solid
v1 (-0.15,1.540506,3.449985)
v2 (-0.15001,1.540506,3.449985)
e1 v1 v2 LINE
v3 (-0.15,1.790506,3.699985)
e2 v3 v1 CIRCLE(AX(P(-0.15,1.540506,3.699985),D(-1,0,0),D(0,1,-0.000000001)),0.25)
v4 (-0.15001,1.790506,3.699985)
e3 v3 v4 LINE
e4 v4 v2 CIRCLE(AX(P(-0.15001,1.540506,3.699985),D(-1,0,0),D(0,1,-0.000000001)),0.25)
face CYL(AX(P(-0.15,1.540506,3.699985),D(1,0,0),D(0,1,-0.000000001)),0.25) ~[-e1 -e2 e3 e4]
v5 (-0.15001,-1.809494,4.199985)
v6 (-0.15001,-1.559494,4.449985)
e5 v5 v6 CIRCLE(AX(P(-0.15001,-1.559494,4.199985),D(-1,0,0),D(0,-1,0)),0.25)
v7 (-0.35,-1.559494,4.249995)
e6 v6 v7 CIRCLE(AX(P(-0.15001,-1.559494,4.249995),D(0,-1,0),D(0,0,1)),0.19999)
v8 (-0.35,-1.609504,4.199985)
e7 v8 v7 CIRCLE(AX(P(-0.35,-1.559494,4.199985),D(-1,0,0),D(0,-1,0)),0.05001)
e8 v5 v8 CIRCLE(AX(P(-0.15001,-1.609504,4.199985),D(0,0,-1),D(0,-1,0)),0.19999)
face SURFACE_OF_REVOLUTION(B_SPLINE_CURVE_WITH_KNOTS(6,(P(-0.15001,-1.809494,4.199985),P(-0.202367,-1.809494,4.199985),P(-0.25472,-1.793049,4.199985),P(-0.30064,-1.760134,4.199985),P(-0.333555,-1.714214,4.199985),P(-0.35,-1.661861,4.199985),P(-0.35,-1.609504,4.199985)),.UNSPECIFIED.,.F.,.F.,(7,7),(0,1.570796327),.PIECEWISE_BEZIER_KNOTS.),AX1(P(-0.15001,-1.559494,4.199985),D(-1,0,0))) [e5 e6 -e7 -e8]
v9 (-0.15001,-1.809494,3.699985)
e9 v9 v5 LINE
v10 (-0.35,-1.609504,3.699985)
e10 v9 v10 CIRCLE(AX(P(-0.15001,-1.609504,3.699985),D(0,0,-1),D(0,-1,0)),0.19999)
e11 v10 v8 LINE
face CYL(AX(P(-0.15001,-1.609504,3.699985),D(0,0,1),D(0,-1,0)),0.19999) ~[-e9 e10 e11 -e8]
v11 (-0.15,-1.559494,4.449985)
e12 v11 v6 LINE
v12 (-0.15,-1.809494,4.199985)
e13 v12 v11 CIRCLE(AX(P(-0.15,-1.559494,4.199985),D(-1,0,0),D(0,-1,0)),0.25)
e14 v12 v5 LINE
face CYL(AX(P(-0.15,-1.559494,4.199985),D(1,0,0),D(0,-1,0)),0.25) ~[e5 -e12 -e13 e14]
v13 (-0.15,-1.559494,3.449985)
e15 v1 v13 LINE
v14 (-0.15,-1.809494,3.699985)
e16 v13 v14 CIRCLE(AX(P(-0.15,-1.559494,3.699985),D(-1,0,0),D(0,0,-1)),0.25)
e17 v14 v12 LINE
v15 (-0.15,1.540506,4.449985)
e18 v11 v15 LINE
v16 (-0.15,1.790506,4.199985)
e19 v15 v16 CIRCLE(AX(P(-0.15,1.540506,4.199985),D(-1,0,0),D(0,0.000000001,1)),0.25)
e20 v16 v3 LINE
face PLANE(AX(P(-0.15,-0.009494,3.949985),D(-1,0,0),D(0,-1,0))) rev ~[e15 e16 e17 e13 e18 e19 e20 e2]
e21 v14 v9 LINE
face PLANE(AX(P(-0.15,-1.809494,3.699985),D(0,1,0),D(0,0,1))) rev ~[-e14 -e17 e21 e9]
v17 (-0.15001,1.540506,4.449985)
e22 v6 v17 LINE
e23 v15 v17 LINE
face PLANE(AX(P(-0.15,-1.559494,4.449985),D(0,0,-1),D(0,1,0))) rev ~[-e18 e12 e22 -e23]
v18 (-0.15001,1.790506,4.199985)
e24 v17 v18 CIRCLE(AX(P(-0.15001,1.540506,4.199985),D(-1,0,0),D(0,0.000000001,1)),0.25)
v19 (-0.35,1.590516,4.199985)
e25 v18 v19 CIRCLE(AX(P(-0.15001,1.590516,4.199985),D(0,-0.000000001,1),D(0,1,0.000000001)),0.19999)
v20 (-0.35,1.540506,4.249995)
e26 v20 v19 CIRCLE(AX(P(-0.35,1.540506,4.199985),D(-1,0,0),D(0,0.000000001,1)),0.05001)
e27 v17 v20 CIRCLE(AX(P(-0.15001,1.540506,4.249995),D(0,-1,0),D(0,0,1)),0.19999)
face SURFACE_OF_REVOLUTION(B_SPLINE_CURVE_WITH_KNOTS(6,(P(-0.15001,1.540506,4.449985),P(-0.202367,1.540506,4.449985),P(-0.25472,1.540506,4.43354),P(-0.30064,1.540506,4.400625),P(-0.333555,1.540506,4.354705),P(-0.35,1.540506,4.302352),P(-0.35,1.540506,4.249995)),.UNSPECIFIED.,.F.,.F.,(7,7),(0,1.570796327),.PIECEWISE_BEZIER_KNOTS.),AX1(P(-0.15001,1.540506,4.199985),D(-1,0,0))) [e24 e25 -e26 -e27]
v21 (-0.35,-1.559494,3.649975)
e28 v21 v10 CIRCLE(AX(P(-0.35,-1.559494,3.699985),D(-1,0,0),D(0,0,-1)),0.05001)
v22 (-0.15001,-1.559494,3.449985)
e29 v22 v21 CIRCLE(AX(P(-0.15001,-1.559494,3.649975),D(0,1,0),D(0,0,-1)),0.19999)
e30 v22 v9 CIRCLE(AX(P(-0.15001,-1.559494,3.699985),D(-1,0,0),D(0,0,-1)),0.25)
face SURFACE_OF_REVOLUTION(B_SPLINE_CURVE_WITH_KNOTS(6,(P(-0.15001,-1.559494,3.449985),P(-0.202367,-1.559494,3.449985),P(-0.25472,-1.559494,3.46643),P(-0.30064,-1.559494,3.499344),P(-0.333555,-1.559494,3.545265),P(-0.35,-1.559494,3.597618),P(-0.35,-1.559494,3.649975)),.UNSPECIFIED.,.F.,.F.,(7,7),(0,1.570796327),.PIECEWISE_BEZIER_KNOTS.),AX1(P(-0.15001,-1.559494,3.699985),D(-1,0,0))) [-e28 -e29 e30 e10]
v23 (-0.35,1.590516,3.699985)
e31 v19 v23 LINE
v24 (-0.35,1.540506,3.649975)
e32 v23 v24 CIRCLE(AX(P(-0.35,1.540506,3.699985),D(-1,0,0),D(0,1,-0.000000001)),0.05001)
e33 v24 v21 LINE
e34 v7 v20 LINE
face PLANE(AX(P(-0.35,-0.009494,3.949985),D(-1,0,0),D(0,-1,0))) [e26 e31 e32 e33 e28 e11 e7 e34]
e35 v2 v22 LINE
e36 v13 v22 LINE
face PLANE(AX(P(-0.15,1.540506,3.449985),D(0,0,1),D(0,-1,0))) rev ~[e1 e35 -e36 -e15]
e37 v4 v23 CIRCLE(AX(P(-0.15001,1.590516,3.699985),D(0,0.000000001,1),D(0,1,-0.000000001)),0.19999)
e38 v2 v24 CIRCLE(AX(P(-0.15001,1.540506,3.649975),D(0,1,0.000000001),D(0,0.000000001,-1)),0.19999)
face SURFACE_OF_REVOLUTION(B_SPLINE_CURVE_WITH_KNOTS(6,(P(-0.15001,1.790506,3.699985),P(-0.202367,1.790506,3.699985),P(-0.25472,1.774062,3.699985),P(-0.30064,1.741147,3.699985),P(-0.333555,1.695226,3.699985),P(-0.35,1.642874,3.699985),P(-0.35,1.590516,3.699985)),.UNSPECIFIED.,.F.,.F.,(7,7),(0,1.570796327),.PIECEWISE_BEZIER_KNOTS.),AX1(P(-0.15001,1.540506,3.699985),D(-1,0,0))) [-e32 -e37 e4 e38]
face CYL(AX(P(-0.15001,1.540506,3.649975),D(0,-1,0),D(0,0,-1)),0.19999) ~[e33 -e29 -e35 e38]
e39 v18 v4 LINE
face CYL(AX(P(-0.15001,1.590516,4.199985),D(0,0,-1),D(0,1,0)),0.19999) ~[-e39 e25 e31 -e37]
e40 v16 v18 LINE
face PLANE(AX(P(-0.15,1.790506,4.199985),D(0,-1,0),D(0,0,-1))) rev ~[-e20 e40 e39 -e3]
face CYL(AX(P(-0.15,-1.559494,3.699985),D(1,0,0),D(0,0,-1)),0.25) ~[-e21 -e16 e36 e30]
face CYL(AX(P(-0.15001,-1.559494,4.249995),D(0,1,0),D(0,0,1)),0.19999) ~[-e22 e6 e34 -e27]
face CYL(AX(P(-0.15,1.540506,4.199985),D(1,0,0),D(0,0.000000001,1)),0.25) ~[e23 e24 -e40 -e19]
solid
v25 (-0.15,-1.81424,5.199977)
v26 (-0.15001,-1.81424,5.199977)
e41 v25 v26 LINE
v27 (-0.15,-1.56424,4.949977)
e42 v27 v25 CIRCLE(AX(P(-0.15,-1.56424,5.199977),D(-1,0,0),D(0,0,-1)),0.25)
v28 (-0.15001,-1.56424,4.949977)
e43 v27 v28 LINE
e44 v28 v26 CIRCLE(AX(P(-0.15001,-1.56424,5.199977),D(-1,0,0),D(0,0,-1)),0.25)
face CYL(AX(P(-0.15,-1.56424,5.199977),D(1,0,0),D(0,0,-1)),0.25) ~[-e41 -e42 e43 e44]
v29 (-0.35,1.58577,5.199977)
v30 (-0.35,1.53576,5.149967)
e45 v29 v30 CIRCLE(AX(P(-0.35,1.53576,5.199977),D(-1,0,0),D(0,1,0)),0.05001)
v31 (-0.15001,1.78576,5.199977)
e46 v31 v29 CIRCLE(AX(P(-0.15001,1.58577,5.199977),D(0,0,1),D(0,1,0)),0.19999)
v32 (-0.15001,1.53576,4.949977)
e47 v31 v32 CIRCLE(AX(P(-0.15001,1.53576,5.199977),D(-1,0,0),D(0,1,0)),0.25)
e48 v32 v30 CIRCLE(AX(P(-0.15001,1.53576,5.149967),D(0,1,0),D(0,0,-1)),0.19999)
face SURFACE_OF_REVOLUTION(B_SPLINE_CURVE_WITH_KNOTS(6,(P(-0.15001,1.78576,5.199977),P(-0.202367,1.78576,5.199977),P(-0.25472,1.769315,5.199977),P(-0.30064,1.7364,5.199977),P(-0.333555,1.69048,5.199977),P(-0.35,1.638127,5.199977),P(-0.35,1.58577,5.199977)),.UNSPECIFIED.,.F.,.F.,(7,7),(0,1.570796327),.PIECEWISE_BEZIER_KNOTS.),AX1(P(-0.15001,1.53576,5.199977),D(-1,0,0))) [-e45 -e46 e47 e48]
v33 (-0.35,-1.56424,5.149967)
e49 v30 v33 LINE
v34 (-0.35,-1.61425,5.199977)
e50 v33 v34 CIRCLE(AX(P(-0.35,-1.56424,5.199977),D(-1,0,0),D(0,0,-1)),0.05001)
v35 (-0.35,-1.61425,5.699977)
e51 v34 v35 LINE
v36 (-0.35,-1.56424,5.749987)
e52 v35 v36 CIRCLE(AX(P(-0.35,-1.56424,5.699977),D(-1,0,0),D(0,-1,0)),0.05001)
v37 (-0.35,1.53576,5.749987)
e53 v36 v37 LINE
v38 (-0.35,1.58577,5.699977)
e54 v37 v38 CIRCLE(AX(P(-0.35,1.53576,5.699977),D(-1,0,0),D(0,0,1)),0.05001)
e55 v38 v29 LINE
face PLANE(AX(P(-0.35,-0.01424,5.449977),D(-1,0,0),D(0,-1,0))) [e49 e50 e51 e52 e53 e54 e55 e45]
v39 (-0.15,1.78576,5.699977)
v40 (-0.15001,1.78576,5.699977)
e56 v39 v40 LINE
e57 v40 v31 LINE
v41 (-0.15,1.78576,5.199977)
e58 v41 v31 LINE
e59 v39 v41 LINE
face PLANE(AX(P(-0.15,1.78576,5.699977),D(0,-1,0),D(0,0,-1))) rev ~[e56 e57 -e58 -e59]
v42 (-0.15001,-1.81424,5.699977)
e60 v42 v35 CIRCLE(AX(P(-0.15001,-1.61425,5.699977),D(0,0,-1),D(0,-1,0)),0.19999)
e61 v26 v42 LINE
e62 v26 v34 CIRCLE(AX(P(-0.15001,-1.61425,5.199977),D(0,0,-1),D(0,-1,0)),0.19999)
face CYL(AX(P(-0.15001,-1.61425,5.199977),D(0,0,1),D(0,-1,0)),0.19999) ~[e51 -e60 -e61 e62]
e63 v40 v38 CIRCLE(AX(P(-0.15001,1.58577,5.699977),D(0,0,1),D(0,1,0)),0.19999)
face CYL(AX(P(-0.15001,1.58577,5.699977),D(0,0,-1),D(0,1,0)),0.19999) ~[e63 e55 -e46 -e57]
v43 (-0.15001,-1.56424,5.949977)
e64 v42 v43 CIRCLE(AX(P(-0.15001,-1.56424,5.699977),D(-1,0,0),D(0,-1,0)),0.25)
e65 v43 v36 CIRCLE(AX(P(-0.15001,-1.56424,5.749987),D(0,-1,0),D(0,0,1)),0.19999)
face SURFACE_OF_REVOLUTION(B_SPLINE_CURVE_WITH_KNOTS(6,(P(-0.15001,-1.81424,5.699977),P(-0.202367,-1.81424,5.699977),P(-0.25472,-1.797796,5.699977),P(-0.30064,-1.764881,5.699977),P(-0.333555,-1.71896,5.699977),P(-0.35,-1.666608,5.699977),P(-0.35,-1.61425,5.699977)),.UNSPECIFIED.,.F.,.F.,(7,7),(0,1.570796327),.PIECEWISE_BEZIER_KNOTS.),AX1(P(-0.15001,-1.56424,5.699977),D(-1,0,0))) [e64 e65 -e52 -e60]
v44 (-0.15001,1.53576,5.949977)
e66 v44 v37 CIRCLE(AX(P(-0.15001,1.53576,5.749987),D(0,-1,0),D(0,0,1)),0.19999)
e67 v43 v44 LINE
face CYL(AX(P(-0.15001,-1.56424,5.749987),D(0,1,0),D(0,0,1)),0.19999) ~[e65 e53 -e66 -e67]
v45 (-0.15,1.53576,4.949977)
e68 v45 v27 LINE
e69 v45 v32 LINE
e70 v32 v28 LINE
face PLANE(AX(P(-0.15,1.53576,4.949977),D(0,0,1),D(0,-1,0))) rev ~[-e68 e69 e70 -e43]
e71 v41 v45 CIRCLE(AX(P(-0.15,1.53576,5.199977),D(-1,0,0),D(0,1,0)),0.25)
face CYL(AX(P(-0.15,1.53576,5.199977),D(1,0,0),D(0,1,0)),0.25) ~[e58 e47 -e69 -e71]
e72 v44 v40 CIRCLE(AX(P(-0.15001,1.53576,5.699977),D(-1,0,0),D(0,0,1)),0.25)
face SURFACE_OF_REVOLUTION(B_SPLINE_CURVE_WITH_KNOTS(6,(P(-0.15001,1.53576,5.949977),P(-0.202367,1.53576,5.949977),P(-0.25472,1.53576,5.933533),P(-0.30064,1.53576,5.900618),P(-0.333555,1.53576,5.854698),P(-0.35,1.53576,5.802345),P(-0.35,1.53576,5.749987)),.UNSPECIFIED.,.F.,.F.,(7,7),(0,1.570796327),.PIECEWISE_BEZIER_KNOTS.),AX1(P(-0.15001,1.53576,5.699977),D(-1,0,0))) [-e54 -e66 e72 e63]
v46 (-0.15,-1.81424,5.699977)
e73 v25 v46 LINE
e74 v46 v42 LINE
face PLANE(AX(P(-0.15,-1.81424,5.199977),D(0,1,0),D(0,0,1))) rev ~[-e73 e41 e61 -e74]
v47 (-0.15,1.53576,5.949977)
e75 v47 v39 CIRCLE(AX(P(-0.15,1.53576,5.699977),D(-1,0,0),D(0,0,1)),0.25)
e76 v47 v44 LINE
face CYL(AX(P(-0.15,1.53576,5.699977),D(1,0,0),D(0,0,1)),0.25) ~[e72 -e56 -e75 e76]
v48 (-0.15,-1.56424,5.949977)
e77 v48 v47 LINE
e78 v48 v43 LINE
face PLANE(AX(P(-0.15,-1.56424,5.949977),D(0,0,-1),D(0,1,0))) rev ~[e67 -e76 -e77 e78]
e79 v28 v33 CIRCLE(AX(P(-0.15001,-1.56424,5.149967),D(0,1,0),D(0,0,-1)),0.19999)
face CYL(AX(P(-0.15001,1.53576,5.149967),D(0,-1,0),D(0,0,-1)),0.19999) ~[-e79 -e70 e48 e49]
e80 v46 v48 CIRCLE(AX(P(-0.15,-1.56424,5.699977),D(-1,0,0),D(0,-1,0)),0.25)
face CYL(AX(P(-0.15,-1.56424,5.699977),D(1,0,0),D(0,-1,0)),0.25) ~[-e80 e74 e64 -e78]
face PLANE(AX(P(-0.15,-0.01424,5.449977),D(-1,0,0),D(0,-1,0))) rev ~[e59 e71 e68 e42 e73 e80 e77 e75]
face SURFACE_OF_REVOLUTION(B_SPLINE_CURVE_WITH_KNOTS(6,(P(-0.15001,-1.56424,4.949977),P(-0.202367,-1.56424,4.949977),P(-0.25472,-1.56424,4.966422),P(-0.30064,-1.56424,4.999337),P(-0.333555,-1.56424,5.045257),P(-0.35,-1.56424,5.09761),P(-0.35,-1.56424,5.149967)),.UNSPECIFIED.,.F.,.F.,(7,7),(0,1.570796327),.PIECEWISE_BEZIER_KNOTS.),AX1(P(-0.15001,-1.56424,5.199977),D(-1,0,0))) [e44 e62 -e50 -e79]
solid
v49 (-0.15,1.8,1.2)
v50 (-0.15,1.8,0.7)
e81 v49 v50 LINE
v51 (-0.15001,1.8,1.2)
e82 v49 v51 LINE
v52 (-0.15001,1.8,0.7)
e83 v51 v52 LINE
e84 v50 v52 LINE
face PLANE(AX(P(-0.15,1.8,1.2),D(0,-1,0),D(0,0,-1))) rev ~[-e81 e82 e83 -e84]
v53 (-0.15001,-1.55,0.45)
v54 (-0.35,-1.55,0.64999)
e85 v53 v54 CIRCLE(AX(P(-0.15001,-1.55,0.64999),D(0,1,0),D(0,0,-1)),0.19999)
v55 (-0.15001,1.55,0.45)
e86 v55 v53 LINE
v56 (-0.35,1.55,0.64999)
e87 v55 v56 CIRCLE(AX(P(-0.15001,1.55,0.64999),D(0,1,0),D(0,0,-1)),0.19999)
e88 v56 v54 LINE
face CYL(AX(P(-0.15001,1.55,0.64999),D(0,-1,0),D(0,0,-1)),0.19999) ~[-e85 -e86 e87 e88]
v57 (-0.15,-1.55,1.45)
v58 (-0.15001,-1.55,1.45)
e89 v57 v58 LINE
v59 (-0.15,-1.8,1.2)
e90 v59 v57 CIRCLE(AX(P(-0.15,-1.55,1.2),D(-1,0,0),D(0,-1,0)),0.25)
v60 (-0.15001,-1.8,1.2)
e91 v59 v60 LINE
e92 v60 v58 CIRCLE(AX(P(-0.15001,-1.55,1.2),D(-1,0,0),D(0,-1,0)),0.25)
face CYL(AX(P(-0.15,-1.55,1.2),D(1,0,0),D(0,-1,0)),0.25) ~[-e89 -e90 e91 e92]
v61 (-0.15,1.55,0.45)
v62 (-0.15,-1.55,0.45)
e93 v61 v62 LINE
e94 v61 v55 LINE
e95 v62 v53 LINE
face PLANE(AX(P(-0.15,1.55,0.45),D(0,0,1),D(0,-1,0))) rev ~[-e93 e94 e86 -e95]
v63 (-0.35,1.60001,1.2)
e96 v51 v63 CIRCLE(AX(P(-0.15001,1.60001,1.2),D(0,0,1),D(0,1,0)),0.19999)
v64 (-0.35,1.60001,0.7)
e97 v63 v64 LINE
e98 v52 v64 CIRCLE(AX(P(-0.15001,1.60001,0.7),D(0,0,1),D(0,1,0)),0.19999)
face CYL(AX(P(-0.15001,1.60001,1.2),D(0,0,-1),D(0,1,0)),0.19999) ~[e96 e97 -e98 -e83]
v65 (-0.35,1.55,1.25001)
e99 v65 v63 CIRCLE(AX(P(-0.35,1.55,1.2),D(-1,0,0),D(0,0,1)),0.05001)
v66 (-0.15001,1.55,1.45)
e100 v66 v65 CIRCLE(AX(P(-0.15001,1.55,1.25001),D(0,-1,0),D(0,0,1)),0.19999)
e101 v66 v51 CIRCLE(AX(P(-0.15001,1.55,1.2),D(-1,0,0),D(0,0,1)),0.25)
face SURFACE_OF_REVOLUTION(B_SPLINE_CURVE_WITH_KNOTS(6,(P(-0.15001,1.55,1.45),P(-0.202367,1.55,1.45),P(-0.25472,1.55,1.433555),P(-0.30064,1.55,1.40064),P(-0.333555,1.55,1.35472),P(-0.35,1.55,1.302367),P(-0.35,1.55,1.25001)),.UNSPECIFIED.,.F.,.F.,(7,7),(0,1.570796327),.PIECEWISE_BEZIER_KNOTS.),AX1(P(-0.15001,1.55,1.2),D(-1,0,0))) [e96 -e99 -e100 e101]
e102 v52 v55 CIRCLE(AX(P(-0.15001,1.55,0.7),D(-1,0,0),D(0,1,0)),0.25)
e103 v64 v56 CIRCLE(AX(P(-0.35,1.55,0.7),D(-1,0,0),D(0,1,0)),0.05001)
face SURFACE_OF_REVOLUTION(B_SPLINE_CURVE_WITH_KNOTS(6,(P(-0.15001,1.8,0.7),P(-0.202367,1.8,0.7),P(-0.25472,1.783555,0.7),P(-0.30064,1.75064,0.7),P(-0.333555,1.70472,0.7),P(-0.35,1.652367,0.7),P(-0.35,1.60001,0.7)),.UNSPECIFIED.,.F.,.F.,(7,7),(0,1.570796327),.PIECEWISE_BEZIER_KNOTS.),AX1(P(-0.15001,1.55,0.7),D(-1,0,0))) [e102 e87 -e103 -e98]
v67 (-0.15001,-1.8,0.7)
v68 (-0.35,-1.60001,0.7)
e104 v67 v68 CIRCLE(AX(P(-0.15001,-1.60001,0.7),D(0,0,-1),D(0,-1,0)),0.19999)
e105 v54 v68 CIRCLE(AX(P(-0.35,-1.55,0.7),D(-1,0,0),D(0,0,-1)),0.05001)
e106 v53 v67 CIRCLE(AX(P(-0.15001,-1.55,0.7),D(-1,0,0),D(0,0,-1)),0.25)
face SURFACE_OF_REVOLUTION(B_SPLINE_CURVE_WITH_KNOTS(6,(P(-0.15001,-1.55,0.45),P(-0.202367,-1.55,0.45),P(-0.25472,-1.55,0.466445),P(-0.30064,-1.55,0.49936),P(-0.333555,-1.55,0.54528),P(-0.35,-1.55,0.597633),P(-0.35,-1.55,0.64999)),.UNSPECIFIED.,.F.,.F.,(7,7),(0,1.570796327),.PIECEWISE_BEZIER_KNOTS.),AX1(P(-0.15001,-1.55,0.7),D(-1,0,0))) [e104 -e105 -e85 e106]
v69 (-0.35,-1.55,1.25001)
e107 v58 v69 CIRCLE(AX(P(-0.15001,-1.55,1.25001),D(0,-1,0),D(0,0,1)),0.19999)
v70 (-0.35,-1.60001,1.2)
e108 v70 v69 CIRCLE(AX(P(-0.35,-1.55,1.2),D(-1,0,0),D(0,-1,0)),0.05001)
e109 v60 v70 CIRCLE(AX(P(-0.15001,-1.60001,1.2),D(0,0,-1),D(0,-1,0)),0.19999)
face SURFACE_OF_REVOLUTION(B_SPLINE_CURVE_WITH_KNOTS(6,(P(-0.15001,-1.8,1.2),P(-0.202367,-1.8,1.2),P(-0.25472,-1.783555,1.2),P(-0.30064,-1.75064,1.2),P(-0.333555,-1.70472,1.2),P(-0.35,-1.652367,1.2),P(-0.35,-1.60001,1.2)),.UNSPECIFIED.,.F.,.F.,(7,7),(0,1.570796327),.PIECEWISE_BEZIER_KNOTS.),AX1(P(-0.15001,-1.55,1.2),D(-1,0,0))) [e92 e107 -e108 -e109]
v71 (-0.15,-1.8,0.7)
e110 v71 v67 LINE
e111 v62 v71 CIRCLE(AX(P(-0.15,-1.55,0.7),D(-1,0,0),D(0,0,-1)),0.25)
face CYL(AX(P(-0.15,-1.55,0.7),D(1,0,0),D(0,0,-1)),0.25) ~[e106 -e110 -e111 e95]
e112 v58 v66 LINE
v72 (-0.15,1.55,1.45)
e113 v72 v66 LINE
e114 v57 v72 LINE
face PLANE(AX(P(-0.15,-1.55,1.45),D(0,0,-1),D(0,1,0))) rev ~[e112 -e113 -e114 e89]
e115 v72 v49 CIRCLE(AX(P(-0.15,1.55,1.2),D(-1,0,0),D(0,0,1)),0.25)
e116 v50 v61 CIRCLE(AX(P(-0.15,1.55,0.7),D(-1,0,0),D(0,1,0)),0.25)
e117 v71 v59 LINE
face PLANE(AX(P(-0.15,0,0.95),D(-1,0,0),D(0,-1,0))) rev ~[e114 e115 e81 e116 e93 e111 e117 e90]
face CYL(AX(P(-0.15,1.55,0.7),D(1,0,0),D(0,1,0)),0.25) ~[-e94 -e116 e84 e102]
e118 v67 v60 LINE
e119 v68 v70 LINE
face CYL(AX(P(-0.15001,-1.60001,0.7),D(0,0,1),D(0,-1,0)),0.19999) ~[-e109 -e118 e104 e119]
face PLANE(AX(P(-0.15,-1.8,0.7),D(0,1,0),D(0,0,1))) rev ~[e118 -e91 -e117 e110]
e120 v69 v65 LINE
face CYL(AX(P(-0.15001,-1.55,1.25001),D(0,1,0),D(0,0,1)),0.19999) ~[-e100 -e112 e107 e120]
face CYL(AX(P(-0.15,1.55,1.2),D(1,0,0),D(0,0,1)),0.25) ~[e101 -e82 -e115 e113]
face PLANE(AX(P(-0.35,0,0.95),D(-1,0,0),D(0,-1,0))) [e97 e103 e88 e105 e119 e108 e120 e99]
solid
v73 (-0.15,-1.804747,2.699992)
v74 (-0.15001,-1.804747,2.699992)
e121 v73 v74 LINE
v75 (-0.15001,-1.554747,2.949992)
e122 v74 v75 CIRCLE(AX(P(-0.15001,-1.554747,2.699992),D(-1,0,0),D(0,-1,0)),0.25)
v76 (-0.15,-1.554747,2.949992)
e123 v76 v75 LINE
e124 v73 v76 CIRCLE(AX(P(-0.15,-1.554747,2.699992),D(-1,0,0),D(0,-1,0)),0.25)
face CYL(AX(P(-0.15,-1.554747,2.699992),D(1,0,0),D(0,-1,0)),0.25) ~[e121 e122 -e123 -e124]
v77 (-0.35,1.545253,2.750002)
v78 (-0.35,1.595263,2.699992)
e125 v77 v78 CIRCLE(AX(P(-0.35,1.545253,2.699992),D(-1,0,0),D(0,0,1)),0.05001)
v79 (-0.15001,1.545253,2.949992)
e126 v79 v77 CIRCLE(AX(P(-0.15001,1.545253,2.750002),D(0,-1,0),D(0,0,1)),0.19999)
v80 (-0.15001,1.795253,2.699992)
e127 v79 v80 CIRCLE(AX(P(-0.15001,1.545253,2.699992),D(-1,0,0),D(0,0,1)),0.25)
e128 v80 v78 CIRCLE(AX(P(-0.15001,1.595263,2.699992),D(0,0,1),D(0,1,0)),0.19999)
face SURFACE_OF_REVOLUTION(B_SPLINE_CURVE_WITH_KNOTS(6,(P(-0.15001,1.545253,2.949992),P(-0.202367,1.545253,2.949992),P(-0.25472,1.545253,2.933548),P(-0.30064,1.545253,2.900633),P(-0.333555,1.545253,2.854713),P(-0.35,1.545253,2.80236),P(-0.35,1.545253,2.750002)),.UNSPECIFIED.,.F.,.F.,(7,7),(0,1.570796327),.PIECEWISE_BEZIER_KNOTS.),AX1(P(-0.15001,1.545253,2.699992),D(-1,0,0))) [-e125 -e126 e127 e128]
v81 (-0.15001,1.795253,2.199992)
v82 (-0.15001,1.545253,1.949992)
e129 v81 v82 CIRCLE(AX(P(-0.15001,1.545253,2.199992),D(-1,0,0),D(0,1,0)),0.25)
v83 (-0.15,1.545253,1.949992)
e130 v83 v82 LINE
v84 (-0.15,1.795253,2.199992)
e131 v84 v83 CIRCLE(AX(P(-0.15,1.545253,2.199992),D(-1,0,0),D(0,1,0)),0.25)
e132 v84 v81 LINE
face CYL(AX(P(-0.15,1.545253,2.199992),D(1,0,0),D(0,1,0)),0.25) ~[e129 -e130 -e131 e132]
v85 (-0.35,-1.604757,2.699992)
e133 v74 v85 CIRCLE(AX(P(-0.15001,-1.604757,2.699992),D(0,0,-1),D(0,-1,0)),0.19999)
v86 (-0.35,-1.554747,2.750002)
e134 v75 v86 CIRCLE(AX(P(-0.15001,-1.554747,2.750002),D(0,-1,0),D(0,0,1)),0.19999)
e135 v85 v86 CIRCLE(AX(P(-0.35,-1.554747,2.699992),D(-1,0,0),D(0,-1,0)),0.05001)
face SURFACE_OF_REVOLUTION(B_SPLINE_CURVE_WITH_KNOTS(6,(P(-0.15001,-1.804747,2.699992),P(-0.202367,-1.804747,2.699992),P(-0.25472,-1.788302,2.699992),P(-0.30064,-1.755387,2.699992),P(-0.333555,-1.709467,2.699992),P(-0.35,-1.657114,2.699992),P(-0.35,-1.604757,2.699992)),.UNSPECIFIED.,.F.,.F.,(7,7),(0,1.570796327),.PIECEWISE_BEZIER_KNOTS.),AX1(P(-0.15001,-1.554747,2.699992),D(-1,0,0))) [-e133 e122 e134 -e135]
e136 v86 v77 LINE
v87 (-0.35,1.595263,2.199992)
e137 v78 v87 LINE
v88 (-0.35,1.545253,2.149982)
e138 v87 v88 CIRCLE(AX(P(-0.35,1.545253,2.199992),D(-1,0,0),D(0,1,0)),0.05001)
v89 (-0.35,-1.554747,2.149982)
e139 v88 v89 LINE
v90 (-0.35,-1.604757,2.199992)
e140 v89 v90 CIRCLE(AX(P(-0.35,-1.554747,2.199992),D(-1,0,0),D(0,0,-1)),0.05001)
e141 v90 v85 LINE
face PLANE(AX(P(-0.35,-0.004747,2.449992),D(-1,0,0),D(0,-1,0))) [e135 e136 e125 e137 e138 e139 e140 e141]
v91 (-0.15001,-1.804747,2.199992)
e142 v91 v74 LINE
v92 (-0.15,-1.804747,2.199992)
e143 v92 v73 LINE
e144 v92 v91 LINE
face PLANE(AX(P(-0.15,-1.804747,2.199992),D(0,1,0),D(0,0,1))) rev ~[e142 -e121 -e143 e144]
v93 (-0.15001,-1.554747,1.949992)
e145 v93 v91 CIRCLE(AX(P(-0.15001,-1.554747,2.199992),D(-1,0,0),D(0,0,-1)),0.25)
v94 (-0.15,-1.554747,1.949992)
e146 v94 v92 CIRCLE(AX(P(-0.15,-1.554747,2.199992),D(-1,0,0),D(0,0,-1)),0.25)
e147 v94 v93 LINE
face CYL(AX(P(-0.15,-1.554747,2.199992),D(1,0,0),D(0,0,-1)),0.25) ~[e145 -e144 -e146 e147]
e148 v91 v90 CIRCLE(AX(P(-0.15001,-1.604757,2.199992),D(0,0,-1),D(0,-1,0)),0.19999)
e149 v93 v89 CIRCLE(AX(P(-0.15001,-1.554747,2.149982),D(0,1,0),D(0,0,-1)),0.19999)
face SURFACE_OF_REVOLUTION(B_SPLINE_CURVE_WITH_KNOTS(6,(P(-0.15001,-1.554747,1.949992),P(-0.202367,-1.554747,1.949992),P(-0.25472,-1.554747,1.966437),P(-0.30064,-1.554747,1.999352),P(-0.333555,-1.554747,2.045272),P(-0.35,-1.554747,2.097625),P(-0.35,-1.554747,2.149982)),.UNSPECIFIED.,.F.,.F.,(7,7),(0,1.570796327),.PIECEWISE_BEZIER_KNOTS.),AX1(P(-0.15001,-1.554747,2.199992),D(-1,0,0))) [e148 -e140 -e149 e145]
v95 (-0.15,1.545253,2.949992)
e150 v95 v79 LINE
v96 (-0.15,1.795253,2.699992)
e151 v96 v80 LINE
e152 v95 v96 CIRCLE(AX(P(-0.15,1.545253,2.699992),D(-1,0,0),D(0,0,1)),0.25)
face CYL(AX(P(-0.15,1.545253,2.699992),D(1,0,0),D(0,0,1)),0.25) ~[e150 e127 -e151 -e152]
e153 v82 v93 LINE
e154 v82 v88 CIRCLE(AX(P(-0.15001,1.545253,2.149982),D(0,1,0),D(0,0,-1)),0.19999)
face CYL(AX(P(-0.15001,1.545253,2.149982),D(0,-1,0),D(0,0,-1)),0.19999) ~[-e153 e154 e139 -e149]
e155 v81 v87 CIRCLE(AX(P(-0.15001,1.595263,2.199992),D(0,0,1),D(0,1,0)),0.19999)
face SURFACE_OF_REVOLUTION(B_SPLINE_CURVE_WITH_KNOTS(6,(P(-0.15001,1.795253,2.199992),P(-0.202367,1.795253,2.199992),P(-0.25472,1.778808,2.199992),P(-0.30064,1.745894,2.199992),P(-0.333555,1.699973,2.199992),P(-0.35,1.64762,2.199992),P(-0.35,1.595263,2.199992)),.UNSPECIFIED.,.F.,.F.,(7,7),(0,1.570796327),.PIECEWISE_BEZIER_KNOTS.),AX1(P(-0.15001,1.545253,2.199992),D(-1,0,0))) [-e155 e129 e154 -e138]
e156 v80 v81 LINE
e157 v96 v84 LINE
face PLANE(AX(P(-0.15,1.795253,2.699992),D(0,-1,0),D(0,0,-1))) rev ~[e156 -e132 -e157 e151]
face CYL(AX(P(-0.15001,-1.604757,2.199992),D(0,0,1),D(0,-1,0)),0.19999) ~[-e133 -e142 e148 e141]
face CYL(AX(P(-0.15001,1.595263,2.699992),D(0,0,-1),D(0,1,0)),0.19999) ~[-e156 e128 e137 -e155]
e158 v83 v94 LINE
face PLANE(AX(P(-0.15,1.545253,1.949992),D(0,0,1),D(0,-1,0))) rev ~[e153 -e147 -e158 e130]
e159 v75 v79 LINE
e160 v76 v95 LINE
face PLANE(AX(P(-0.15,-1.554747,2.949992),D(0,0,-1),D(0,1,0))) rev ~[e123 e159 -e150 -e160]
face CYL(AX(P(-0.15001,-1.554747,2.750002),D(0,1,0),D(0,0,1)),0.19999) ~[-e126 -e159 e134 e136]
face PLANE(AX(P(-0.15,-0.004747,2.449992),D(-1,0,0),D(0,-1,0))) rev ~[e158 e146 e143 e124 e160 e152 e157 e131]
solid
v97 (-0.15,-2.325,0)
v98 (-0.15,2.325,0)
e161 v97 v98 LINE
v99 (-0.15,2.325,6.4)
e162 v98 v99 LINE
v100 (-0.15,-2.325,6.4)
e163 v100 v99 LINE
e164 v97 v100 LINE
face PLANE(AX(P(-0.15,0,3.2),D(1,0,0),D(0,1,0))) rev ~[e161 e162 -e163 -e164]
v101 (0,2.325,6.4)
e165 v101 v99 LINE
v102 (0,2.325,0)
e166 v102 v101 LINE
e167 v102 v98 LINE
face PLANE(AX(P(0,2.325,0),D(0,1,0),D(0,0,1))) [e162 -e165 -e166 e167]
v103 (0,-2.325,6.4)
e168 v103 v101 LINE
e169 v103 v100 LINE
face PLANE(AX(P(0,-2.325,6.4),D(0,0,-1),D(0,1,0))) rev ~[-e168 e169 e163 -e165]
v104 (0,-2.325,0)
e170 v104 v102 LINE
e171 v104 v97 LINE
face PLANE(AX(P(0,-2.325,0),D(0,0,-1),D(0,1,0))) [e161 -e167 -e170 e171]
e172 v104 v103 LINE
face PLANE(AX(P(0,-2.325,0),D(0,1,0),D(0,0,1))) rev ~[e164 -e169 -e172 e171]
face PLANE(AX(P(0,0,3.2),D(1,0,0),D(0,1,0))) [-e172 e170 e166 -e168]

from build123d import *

# Parameters (mm, degrees)
F0_W     = 4.65
F0_H     = 6.4
F1_DEPTH = 0.15
F3_DEPTH = 0.2
F4_R     = 0.19999
F4_2_R   = 0.19999
F4_3_R   = 0.19999
F4_4_R   = 0.19999


# Not quite as in the source:
# - a fillet or chamfer is up to 0.001 mm smaller than in the source, because OpenCascade refuses the exact size


with BuildPart() as f1:
    # F0 (on Right) → F1 (new body)
    with BuildSketch(Plane.YZ):
        with Locations((0, 3.2)):
            Rectangle(F0_W, F0_H)
    extrude(amount=-F1_DEPTH)


with BuildPart() as f3:
    # F2 (on face) → F3 (new body)
    with BuildSketch(Plane(origin=(-0.15, 0, 0), x_dir=(0, -1, 0), z_dir=(-1, 0, 0))):
        with BuildLine():
            Line((-1.55, 0.45), (1.55, 0.45))
            ThreePointArc((1.55, 0.45), (1.7267766953, 0.5232233047), (1.8, 0.7))
            Line((1.8, 0.7), (1.8, 1.2))
            ThreePointArc((1.8, 1.2), (1.7267766953, 1.3767766953), (1.55, 1.45))
            Line((1.55, 1.45), (-1.55, 1.45))
            ThreePointArc((-1.55, 1.45), (-1.7267766953, 1.3767766953), (-1.8, 1.2))
            Line((-1.8, 1.2), (-1.8, 0.7))
            ThreePointArc((-1.8, 0.7), (-1.7267766953, 0.5232233047), (-1.55, 0.45))
        make_face()
    extrude(amount=F3_DEPTH)

    # F4#4 (radius 0.2 in the source; OpenCascade refuses exactly that, so slightly less here)
    f4_4_edges = [f3.edges().sort_by_distance(p)[0] for p in [
        (-0.35, 0, 0.45),
        (-0.35, -1.726777, 0.523223),
        (-0.35, -1.8, 0.95),
        (-0.35, -1.726777, 1.376777),
        (-0.35, 0, 1.45),
        (-0.35, 1.726777, 1.376777),
        (-0.35, 1.8, 0.95),
        (-0.35, 1.726777, 0.523223),
    ]]
    fillet(f4_4_edges, radius=F4_4_R)


with BuildPart() as f3b:
    # F2 (on face) → F3, piece 2 (new body)
    with BuildSketch(Plane(origin=(-0.15, 0, 0), x_dir=(0, -1, 0), z_dir=(-1, 0, 0))):
        with BuildLine():
            Line((-1.5452531883, 1.9499924892), (1.5547468117, 1.9499924892))
            ThreePointArc((1.5547468117, 1.9499924892), (1.731523507, 2.0232157939), (1.8047468117, 2.1999924892))
            Line((1.8047468117, 2.1999924892), (1.8047468117, 2.6999924892))
            ThreePointArc((1.8047468117, 2.6999924892), (1.731523507, 2.8767691845), (1.5547468117, 2.9499924892))
            Line((1.5547468117, 2.9499924892), (-1.5452531883, 2.9499924892))
            ThreePointArc((-1.5452531883, 2.9499924892), (-1.7220298836, 2.8767691845), (-1.7952531883, 2.6999924892))
            Line((-1.7952531883, 2.6999924892), (-1.7952531883, 2.1999924892))
            ThreePointArc((-1.7952531883, 2.1999924892), (-1.7220298836, 2.0232157939), (-1.5452531883, 1.9499924892))
        make_face()
    extrude(amount=F3_DEPTH)

    # F4#3 (radius 0.2 in the source; OpenCascade refuses exactly that, so slightly less here)
    f4_3_edges = [f3b.edges().sort_by_distance(p)[0] for p in [
        (-0.35, 1.72203, 2.023216),
        (-0.35, -0.004747, 1.949992),
        (-0.35, -1.731524, 2.023216),
        (-0.35, -1.804747, 2.449992),
        (-0.35, -1.731524, 2.876769),
        (-0.35, -0.004747, 2.949992),
        (-0.35, 1.72203, 2.876769),
        (-0.35, 1.795253, 2.449992),
    ]]
    fillet(f4_3_edges, radius=F4_3_R)


with BuildPart() as f3c:
    # F2 (on face) → F3, piece 3 (new body)
    with BuildSketch(Plane(origin=(-0.15, 0, 0), x_dir=(0, -1, 0), z_dir=(-1, 0, 0))):
        with BuildLine():
            Line((-1.5405063767, 3.4499849785), (1.5594936233, 3.4499849785))
            ThreePointArc((1.5594936233, 3.4499849785), (1.7362703186, 3.5232082832), (1.8094936233, 3.6999849785))
            Line((1.8094936233, 3.6999849785), (1.8094936233, 4.1999849785))
            ThreePointArc((1.8094936233, 4.1999849785), (1.7362703186, 4.3767616738), (1.5594936233, 4.4499849785))
            Line((1.5594936233, 4.4499849785), (-1.5405063767, 4.4499849785))
            ThreePointArc((-1.5405063767, 4.4499849785), (-1.7172830719, 4.3767616738), (-1.7905063767, 4.1999849785))
            Line((-1.7905063767, 4.1999849785), (-1.7905063767, 3.6999849785))
            ThreePointArc((-1.7905063767, 3.6999849785), (-1.7172830719, 3.5232082832), (-1.5405063767, 3.4499849785))
        make_face()
    extrude(amount=F3_DEPTH)

    # F4#2 (radius 0.2 in the source; OpenCascade refuses exactly that, so slightly less here)
    f4_2_edges = [f3c.edges().sort_by_distance(p)[0] for p in [
        (-0.35, 1.717283, 3.523208),
        (-0.35, -0.009494, 3.449985),
        (-0.35, -1.73627, 3.523208),
        (-0.35, -1.809494, 3.949985),
        (-0.35, -1.73627, 4.376762),
        (-0.35, -0.009494, 4.449985),
        (-0.35, 1.717283, 4.376762),
        (-0.35, 1.790506, 3.949985),
    ]]
    fillet(f4_2_edges, radius=F4_2_R)


with BuildPart() as f3d:
    # F2 (on face) → F3, piece 4 (new body)
    with BuildSketch(Plane(origin=(-0.15, 0, 0), x_dir=(0, -1, 0), z_dir=(-1, 0, 0))):
        with BuildLine():
            Line((-1.535759565, 4.9499774677), (1.564240435, 4.9499774677))
            ThreePointArc((1.564240435, 4.9499774677), (1.7410171303, 5.0232007724), (1.814240435, 5.1999774677))
            Line((1.814240435, 5.1999774677), (1.814240435, 5.6999774677))
            ThreePointArc((1.814240435, 5.6999774677), (1.7410171303, 5.876754163), (1.564240435, 5.9499774677))
            Line((1.564240435, 5.9499774677), (-1.535759565, 5.9499774677))
            ThreePointArc((-1.535759565, 5.9499774677), (-1.7125362603, 5.876754163), (-1.785759565, 5.6999774677))
            Line((-1.785759565, 5.6999774677), (-1.785759565, 5.1999774677))
            ThreePointArc((-1.785759565, 5.1999774677), (-1.7125362603, 5.0232007724), (-1.535759565, 4.9499774677))
        make_face()
    extrude(amount=F3_DEPTH)

    # F4 (radius 0.2 in the source; OpenCascade refuses exactly that, so slightly less here)
    f4_edges = [f3d.edges().sort_by_distance(p)[0] for p in [
        (-0.35, 1.712536, 5.023201),
        (-0.35, -0.01424, 4.949977),
        (-0.35, -1.741017, 5.023201),
        (-0.35, -1.81424, 5.449977),
        (-0.35, -1.741017, 5.876754),
        (-0.35, -0.01424, 5.949977),
        (-0.35, 1.712536, 5.876754),
        (-0.35, 1.78576, 5.449977),
    ]]
    fillet(f4_edges, radius=F4_R)


solid = Compound([f1.part, f3.part, f3b.part, f3c.part, f3d.part])
